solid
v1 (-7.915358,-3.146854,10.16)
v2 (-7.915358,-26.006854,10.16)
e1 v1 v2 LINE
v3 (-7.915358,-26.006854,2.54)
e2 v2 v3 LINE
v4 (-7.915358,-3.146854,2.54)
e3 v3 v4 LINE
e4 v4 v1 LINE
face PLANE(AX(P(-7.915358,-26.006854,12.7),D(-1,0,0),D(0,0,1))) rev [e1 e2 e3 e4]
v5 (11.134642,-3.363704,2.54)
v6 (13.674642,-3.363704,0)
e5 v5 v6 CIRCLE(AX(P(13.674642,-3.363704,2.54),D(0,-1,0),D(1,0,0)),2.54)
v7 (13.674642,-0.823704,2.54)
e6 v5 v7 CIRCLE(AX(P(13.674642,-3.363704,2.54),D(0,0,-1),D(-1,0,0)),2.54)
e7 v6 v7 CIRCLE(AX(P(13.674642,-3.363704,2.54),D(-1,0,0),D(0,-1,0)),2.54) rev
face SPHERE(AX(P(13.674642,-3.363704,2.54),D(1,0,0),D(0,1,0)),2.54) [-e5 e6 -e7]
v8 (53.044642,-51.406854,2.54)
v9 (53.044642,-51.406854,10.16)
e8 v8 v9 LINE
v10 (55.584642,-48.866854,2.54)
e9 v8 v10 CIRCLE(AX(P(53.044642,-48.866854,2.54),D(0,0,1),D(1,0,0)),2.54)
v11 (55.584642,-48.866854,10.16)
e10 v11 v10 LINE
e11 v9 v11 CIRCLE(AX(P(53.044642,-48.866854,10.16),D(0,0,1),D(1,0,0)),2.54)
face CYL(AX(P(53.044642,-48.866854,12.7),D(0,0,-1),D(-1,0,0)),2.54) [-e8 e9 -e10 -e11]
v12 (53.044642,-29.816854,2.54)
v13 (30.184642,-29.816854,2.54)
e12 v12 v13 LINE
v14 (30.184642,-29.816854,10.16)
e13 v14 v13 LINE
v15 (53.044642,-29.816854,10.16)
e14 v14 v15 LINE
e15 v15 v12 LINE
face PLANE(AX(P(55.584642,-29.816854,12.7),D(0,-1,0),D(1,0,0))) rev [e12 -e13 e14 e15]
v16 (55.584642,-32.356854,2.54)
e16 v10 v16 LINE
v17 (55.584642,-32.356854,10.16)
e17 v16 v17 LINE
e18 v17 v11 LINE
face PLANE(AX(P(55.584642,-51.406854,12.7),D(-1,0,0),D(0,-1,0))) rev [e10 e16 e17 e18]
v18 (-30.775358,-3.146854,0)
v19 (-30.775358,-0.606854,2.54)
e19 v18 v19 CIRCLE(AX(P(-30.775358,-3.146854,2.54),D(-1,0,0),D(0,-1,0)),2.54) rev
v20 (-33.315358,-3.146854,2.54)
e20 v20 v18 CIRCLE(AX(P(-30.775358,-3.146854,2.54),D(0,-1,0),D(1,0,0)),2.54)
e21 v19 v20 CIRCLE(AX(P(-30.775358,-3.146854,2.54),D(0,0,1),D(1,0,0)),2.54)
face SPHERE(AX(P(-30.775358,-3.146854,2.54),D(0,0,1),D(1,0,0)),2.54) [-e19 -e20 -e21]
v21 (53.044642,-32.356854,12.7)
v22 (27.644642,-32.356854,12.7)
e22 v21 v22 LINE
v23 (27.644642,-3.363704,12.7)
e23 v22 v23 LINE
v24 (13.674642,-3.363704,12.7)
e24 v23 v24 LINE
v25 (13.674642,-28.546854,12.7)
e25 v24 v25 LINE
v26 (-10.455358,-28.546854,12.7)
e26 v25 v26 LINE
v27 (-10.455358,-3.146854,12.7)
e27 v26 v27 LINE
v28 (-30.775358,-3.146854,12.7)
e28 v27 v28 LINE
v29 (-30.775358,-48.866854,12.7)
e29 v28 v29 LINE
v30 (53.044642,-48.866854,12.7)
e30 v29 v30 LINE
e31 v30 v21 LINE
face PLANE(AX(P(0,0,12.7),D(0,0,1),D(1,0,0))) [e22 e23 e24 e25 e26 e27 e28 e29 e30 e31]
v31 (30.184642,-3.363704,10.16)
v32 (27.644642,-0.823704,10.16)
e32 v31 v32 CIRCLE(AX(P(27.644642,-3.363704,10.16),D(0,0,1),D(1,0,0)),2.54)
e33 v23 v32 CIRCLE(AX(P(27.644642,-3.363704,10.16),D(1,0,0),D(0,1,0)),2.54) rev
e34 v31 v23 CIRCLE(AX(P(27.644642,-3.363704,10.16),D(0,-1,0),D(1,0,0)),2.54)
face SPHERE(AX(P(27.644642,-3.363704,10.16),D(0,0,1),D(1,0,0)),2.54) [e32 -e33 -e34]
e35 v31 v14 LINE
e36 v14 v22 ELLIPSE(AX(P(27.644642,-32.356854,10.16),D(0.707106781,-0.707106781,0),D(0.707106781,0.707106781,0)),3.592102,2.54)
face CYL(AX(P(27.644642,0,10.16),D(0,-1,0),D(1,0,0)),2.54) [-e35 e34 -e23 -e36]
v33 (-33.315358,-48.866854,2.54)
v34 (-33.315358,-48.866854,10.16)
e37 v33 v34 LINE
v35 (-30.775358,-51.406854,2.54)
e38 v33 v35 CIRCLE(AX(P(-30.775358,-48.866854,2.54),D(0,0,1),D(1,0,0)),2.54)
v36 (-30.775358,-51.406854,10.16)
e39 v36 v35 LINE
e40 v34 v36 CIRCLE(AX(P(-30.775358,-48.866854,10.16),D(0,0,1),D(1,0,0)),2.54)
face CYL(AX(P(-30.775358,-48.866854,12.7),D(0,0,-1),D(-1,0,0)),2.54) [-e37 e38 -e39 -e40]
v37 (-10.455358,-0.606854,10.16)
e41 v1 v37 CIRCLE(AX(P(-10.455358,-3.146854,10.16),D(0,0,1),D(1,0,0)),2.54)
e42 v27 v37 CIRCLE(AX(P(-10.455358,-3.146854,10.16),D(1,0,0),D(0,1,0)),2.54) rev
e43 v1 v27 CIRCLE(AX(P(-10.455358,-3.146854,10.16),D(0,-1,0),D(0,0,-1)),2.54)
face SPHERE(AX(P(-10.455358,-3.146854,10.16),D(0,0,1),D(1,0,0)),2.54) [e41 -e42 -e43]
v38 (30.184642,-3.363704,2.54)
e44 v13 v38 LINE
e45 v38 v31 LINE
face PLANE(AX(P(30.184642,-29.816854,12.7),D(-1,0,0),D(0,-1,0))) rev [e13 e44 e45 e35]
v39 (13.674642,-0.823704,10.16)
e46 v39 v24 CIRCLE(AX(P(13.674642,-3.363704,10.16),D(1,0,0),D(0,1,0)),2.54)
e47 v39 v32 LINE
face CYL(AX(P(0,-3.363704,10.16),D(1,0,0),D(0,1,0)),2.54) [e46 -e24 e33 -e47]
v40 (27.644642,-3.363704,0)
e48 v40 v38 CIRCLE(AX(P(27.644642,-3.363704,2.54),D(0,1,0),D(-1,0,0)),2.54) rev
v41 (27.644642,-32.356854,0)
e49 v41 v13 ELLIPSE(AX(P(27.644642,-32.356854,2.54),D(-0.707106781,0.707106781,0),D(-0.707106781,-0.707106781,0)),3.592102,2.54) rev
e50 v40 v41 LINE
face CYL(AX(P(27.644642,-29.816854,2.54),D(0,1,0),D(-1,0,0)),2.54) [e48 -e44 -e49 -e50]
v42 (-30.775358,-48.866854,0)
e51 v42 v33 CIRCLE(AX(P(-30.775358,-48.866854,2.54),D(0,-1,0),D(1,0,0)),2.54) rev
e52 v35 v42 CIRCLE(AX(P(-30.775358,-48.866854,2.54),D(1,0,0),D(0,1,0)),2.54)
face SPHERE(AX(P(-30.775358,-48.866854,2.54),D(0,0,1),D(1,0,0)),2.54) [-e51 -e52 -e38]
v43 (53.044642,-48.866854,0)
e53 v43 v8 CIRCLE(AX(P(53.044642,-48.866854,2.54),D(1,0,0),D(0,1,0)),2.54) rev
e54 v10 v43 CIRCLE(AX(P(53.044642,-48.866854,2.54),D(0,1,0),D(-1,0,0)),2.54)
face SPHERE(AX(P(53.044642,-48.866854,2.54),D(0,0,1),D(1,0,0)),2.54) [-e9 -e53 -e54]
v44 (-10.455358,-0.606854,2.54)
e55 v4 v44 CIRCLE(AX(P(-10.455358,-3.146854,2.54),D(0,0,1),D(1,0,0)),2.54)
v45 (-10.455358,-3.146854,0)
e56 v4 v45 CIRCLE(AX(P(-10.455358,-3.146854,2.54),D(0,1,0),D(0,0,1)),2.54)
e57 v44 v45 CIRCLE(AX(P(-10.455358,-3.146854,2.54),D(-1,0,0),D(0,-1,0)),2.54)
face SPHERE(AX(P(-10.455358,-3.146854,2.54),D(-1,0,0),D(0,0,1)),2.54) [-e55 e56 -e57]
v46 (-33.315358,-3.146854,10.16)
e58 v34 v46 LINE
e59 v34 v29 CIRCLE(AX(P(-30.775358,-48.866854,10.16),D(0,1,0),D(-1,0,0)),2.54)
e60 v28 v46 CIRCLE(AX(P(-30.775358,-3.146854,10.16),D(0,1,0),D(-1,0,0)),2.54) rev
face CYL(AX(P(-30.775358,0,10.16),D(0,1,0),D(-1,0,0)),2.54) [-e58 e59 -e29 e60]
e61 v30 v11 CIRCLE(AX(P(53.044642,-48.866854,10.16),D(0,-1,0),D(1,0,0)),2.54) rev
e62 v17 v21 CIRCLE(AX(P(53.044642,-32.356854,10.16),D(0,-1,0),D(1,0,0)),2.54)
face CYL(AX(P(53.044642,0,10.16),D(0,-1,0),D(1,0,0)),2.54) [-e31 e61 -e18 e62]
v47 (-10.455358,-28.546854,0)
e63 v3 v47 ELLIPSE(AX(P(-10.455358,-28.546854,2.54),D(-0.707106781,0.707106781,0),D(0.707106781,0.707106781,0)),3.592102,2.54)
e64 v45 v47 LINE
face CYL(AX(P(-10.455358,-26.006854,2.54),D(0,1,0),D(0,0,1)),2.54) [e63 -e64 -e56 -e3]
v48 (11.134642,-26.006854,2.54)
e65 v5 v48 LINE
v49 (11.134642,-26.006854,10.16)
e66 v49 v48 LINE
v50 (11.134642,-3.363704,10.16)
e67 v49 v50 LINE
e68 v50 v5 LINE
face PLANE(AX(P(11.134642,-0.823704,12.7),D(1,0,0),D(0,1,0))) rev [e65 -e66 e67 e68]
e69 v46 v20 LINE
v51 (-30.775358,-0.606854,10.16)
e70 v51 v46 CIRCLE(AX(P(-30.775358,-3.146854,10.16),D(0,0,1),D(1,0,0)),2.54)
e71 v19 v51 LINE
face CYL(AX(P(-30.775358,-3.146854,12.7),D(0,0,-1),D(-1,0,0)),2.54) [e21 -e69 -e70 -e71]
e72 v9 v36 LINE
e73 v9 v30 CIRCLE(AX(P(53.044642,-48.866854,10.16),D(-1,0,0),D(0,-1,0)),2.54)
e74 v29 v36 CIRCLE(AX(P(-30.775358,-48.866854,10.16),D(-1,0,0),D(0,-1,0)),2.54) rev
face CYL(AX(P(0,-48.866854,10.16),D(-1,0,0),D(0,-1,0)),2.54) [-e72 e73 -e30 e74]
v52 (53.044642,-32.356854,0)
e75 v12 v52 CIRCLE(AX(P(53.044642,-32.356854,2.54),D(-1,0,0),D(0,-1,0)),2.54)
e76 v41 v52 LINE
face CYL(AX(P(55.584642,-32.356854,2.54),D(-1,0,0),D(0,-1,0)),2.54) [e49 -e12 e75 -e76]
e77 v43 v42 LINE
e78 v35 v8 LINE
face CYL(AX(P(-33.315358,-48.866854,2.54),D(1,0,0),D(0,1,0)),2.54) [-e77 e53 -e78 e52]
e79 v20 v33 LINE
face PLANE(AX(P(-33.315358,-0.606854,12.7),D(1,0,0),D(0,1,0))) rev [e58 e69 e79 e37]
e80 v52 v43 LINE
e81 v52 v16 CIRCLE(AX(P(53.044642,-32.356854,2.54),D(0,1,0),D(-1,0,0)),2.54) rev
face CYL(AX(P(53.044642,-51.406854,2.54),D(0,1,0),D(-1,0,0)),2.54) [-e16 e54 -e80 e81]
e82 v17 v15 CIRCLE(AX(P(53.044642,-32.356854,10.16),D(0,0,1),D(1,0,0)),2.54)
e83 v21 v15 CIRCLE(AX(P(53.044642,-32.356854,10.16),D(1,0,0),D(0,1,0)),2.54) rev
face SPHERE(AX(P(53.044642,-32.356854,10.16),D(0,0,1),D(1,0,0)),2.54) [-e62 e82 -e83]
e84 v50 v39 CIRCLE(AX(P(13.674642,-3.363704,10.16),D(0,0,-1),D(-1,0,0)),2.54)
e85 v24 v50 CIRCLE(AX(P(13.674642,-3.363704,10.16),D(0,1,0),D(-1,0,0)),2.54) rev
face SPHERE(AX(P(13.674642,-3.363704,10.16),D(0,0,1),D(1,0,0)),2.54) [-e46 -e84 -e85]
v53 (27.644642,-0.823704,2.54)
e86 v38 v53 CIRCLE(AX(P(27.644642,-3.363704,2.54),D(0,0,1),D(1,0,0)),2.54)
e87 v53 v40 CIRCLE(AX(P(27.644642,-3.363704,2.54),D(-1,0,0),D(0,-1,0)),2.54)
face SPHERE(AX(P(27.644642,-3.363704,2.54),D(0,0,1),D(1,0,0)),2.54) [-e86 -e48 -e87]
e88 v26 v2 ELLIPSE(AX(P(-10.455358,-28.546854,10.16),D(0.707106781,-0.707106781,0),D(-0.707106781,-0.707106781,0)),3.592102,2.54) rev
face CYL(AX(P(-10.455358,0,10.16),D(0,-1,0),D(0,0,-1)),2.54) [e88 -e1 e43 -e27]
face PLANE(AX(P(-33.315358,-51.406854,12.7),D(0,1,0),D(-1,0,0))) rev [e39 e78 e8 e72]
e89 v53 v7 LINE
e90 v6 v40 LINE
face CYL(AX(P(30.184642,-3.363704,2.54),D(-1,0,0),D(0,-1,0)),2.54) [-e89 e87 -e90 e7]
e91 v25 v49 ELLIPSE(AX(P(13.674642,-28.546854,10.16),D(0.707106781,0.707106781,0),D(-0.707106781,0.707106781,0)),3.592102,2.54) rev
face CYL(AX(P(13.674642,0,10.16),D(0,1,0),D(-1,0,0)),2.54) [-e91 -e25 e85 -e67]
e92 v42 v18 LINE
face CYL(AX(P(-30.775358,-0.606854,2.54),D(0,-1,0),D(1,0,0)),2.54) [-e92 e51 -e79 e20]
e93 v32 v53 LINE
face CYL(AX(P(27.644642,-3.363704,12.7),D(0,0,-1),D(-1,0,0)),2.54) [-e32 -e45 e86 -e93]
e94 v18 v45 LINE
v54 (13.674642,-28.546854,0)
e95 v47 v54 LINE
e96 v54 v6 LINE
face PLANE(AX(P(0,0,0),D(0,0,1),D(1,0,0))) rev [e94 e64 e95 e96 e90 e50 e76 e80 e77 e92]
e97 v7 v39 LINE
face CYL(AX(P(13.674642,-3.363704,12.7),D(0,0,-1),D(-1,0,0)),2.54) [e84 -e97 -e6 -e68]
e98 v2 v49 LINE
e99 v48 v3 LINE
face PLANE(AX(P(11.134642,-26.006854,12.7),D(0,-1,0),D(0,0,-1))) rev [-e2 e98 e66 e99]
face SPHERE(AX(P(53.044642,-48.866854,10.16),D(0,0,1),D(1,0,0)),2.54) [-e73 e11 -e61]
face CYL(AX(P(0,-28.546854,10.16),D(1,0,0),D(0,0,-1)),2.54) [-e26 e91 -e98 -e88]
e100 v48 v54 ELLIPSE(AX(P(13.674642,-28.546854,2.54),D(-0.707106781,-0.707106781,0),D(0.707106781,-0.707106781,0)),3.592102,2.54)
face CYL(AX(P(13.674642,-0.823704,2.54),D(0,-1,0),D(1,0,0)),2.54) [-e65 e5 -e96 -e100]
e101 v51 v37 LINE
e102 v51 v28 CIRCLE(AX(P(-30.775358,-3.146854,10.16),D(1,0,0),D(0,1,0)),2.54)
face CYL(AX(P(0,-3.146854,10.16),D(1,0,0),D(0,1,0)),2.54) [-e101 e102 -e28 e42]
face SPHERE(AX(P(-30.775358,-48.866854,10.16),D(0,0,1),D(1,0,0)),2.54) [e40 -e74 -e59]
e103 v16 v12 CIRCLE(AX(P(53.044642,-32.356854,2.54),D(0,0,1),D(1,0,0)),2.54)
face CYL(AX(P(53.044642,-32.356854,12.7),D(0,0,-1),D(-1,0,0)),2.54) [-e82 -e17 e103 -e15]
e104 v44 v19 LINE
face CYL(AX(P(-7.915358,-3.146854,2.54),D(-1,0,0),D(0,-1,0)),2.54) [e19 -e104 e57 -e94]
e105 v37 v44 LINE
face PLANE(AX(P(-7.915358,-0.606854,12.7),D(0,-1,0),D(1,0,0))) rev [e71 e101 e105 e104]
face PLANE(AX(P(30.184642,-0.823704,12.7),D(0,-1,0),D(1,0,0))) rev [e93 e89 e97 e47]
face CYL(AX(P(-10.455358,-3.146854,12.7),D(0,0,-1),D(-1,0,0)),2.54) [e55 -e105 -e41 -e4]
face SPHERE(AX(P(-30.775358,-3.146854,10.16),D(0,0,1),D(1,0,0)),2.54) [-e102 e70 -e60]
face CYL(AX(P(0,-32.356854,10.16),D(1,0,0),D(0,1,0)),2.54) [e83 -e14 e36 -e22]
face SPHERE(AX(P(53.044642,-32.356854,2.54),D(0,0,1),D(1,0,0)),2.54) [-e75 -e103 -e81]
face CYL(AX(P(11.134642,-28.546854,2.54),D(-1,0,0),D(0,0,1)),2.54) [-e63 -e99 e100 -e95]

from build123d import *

# Parameters (mm, degrees)
BOSS_EXTRUDE1_DEPTH = 12.7
FILLET1_R           = 2.54
FILLET2_R           = 2.54
FILLET3_R           = 2.54


with BuildPart() as part:
    # Sketch1 → Boss-Extrude1 (new body)
    with BuildSketch(Plane.XY):
        Polygon((-33.315358132, -51.406853933), (55.584641868, -51.406853933), (55.584641868, -29.816853933), (30.184641868, -29.816853933), (30.184641868, -0.823703806), (11.134641868, -0.823703806), (11.134641868, -26.006853933), (-7.915358132, -26.006853933), (-7.915358132, -0.606853933), (-33.315358132, -0.606853933), align=None)
    extrude(amount=BOSS_EXTRUDE1_DEPTH)

    # Fillet1
    fillet1_edges = [part.edges().sort_by_distance(p)[0] for p in [
        (-20.615358132, -0.606853933, 0),
        (20.659641868, -0.823703806, 0),
        (30.184641868, -15.320278869, 0),
        (42.884641868, -29.816853933, 0),
        (55.584641868, -40.611853933, 12.7),
        (55.584641868, -40.611853933, 0),
        (11.134641868, -51.406853933, 0),
        (-33.315358132, -26.006853933, 0),
        (42.884641868, -29.816853933, 12.7),
        (30.184641868, -15.320278869, 12.7),
        (20.659641868, -0.823703806, 12.7),
        (11.134641868, -13.415278869, 12.7),
        (1.609641868, -26.006853933, 12.7),
        (-7.915358132, -13.306853933, 12.7),
        (-20.615358132, -0.606853933, 12.7),
        (-33.315358132, -26.006853933, 12.7),
        (11.134641868, -51.406853933, 12.7),
    ]]
    fillet(fillet1_edges, radius=FILLET1_R)

    # Fillet2
    # the kernel refuses this fillet: 2.54 mm, written as the material it takes off along each edge
    with BuildSketch(Plane(origin=(13.674641868, -3.363703806, 10.16), x_dir=(0, 1, 0), z_dir=(-1, 0, 0))) as fillet2_piece_1_section:
        Polygon((0, 0), (FILLET2_R, 0), (FILLET2_R, -FILLET2_R), (0, -FILLET2_R), align=None)
    fillet2_piece_1 = extrude(amount=FILLET2_R, mode=Mode.PRIVATE)
    fillet2_piece_1 = fillet2_piece_1 - Plane(origin=(13.674641868, -3.363703806, 10.16), x_dir=(0, -0.7071067811865475, -0.7071067811865475), z_dir=(-1, 0, 0)) * Sphere(FILLET2_R, mode=Mode.PRIVATE)
    add(fillet2_piece_1, mode=Mode.SUBTRACT)
    with BuildSketch(Plane(origin=(-10.455358132, -3.146853933, 10.16), x_dir=(1, 0, 0), z_dir=(0, 1, 0))) as fillet2_piece_2_section:
        Polygon((0, 0), (FILLET2_R, 0), (FILLET2_R, -FILLET2_R), (0, -FILLET2_R), align=None)
    fillet2_piece_2 = extrude(amount=FILLET2_R, mode=Mode.PRIVATE)
    fillet2_piece_2 = fillet2_piece_2 - Plane(origin=(-10.455358132, -3.146853933, 10.16), x_dir=(-0.7071067811865475, 0, -0.7071067811865475), z_dir=(0, 1, 0)) * Sphere(FILLET2_R, mode=Mode.PRIVATE)
    add(fillet2_piece_2, mode=Mode.SUBTRACT)
    with BuildSketch(Plane(origin=(-7.915358132, -26.006853933, 0), x_dir=(-1, 0, 0), z_dir=(0, 1, 0))) as fillet2_piece_3:
        with BuildLine():
            CenterArc((FILLET2_R, FILLET2_R), FILLET2_R, 180, 90)
            Line((0, FILLET2_R), (0, 0))
            Line((0, 0), (FILLET2_R, 0))
        make_face()
    extrude(amount=22.86, mode=Mode.SUBTRACT)
    with BuildSketch(Plane(origin=(11.134641868, -26.006853933, 0), x_dir=(0, -1, 0), z_dir=(-1, 0, 0))) as fillet2_piece_4:
        with BuildLine():
            CenterArc((FILLET2_R, FILLET2_R), FILLET2_R, 180, 90)
            Line((0, FILLET2_R), (0, 0))
            Line((0, 0), (FILLET2_R, 0))
        make_face()
    extrude(amount=19.05, mode=Mode.SUBTRACT)
    with BuildSketch(Plane(origin=(-7.915358132, -0.606853933, 2.54), x_dir=(-1, 0, 0), z_dir=(0, 0, 1)), Plane(origin=(11.134641868, -0.823703806, 2.54), x_dir=(0, -1, 0), z_dir=(0, 0, 1))) as fillet2_piece_5:
        with BuildLine():
            CenterArc((FILLET2_R, FILLET2_R), FILLET2_R, 180, 90)
            Line((0, FILLET2_R), (0, 0))
            Line((0, 0), (FILLET2_R, 0))
        make_face()
    extrude(amount=7.62, mode=Mode.SUBTRACT)
    with BuildSketch(Plane(origin=(11.134641868, -3.363703806, 0), x_dir=(1, 0, 0), z_dir=(0, -1, 0))) as fillet2_piece_6:
        with BuildLine():
            CenterArc((FILLET2_R, FILLET2_R), FILLET2_R, 180, 90)
            Line((0, FILLET2_R), (0, 0))
            Line((0, 0), (FILLET2_R, 0))
        make_face()
    extrude(amount=22.643150126, mode=Mode.SUBTRACT)
    with BuildSketch(Plane(origin=(-7.915358132, -3.146853933, 2.54), x_dir=(0, 1, 0), z_dir=(0, 0, 1))) as fillet2_piece_7:
        with BuildLine():
            CenterArc((2.54 - FILLET2_R, FILLET2_R), FILLET2_R, 270, 90)
            Line((2.54, FILLET2_R), (2.54, 0))
            Line((2.54, 0), (2.54 - FILLET2_R, 0))
        make_face()
    revolve(axis=Axis((-7.915358132, -3.146853933, 2.54), (-1, 0, 0)), revolution_arc=90, mode=Mode.SUBTRACT)
    with BuildSketch(Plane(origin=(11.134641868, -3.363703806, 2.54), x_dir=(0, 1, 0), z_dir=(0, 0, 1))) as fillet2_piece_8:
        with BuildLine():
            CenterArc((2.54 - FILLET2_R, -FILLET2_R), FILLET2_R, 0, 90)
            Line((2.54, -FILLET2_R), (2.54, 0))
            Line((2.54, 0), (2.54 - FILLET2_R, 0))
        make_face()
    revolve(axis=Axis((11.134641868, -3.363703806, 2.54), (-1, 0, 0)), revolution_arc=90, mode=Mode.SUBTRACT)
    with BuildSketch(Plane(origin=(11.134641868, -26.006853933, 0), x_dir=(0, -1, 0), z_dir=(-1, 0, 0))) as fillet2_piece_9a_section:
        with BuildLine():
            CenterArc((FILLET2_R, FILLET2_R), FILLET2_R, 180, 90)
            Line((0, FILLET2_R), (0, 0))
            Line((0, 0), (FILLET2_R, 0))
        make_face()
    fillet2_piece_9a = extrude(amount=25.4, mode=Mode.PRIVATE)
    fillet2_piece_9a = split(fillet2_piece_9a, bisect_by=Plane(origin=(-7.915358132, -26.581897523, 0.57504359), z_dir=(-1, 0, 0)), keep=Keep.TOP, mode=Mode.PRIVATE)
    with BuildSketch(Plane(origin=(-7.915358132, -32.356853933, 0), x_dir=(-1, 0, 0), z_dir=(0, 1, 0))) as fillet2_piece_9b_section:
        with BuildLine():
            CenterArc((FILLET2_R, FILLET2_R), FILLET2_R, 180, 90)
            Line((0, FILLET2_R), (0, 0))
            Line((0, 0), (FILLET2_R, 0))
        make_face()
    fillet2_piece_9b = extrude(amount=29.21, mode=Mode.PRIVATE)
    fillet2_piece_9b = split(fillet2_piece_9b, bisect_by=Plane(origin=(-8.490401722, -26.006853933, 0.57504359), z_dir=(0, -1, 0)), keep=Keep.TOP, mode=Mode.PRIVATE)
    fillet2_piece_9 = fillet2_piece_9a & fillet2_piece_9b
    add(fillet2_piece_9, mode=Mode.SUBTRACT)
    with BuildSketch(Plane(origin=(11.134641868, -3.363703806, 0), x_dir=(1, 0, 0), z_dir=(0, -1, 0))) as fillet2_piece_10a_section:
        with BuildLine():
            CenterArc((FILLET2_R, FILLET2_R), FILLET2_R, 180, 90)
            Line((0, FILLET2_R), (0, 0))
            Line((0, 0), (FILLET2_R, 0))
        make_face()
    fillet2_piece_10a = extrude(amount=28.993150126, mode=Mode.PRIVATE)
    fillet2_piece_10a = split(fillet2_piece_10a, bisect_by=Plane(origin=(11.709685459, -26.006853933, 0.57504359), z_dir=(0, -1, 0)), keep=Keep.TOP, mode=Mode.PRIVATE)
    with BuildSketch(Plane(origin=(17.484641868, -26.006853933, 0), x_dir=(0, -1, 0), z_dir=(-1, 0, 0))) as fillet2_piece_10b_section:
        with BuildLine():
            CenterArc((FILLET2_R, FILLET2_R), FILLET2_R, 180, 90)
            Line((0, FILLET2_R), (0, 0))
            Line((0, 0), (FILLET2_R, 0))
        make_face()
    fillet2_piece_10b = extrude(amount=25.4, mode=Mode.PRIVATE)
    fillet2_piece_10b = split(fillet2_piece_10b, bisect_by=Plane(origin=(11.134641868, -26.581897523, 0.57504359), z_dir=(1, 0, 0)), keep=Keep.TOP, mode=Mode.PRIVATE)
    fillet2_piece_10 = fillet2_piece_10a & fillet2_piece_10b
    add(fillet2_piece_10, mode=Mode.SUBTRACT)

    # Fillet3
    # the kernel refuses this fillet: 2.54 mm, written as the material it takes off along each edge
    with BuildSketch(Plane(origin=(27.644641868, -3.363703806, 2.54), x_dir=(0, 1, 0), z_dir=(1, 0, 0))) as fillet3_piece_1_section:
        Polygon((0, 0), (FILLET3_R, 0), (FILLET3_R, -FILLET3_R), (0, -FILLET3_R), align=None)
    fillet3_piece_1 = extrude(amount=FILLET3_R, mode=Mode.PRIVATE)
    fillet3_piece_1 = fillet3_piece_1 - Plane(origin=(27.644641868, -3.363703806, 2.54), x_dir=(0, -0.7071067811865475, 0.7071067811865475), z_dir=(1, 0, 0)) * Sphere(FILLET3_R, mode=Mode.PRIVATE)
    add(fillet3_piece_1, mode=Mode.SUBTRACT)
    with BuildSketch(Plane(origin=(53.044641868, -32.356853933, 2.54), x_dir=(0, 1, 0), z_dir=(1, 0, 0))) as fillet3_piece_2_section:
        Polygon((0, 0), (FILLET3_R, 0), (FILLET3_R, -FILLET3_R), (0, -FILLET3_R), align=None)
    fillet3_piece_2 = extrude(amount=FILLET3_R, mode=Mode.PRIVATE)
    fillet3_piece_2 = fillet3_piece_2 - Plane(origin=(53.044641868, -32.356853933, 2.54), x_dir=(0, -0.7071067811865475, 0.7071067811865475), z_dir=(1, 0, 0)) * Sphere(FILLET3_R, mode=Mode.PRIVATE)
    add(fillet3_piece_2, mode=Mode.SUBTRACT)
    with BuildSketch(Plane(origin=(53.044641868, -48.866853933, 2.54), x_dir=(1, 0, 0), z_dir=(0, -1, 0))) as fillet3_piece_3_section:
        Polygon((0, 0), (FILLET3_R, 0), (FILLET3_R, -FILLET3_R), (0, -FILLET3_R), align=None)
    fillet3_piece_3 = extrude(amount=FILLET3_R, mode=Mode.PRIVATE)
    fillet3_piece_3 = fillet3_piece_3 - Plane(origin=(53.044641868, -48.866853933, 2.54), x_dir=(-0.7071067811865475, 0, 0.7071067811865475), z_dir=(0, -1, 0)) * Sphere(FILLET3_R, mode=Mode.PRIVATE)
    add(fillet3_piece_3, mode=Mode.SUBTRACT)
    with BuildSketch(Plane(origin=(-30.775358132, -48.866853933, 2.54), x_dir=(-1, 0, 0), z_dir=(0, -1, 0))) as fillet3_piece_4_section:
        Polygon((0, 0), (FILLET3_R, 0), (FILLET3_R, FILLET3_R), (0, FILLET3_R), align=None)
    fillet3_piece_4 = extrude(amount=FILLET3_R, mode=Mode.PRIVATE)
    fillet3_piece_4 = fillet3_piece_4 - Plane(origin=(-30.775358132, -48.866853933, 2.54), x_dir=(0.7071067811865475, 0, 0.7071067811865475), z_dir=(0, -1, 0)) * Sphere(FILLET3_R, mode=Mode.PRIVATE)
    add(fillet3_piece_4, mode=Mode.SUBTRACT)
    with BuildSketch(Plane(origin=(-30.775358132, -3.146853933, 2.54), x_dir=(-1, 0, 0), z_dir=(0, 1, 0))) as fillet3_piece_5_section:
        Polygon((0, 0), (FILLET3_R, 0), (FILLET3_R, -FILLET3_R), (0, -FILLET3_R), align=None)
    fillet3_piece_5 = extrude(amount=FILLET3_R, mode=Mode.PRIVATE)
    fillet3_piece_5 = fillet3_piece_5 - Plane(origin=(-30.775358132, -3.146853933, 2.54), x_dir=(0.7071067811865475, 0, 0.7071067811865475), z_dir=(0, 1, 0)) * Sphere(FILLET3_R, mode=Mode.PRIVATE)
    add(fillet3_piece_5, mode=Mode.SUBTRACT)
    with BuildSketch(Plane(origin=(27.644641868, -3.363703806, 10.16), x_dir=(0, 1, 0), z_dir=(1, 0, 0))) as fillet3_piece_6_section:
        Polygon((0, 0), (FILLET3_R, 0), (FILLET3_R, FILLET3_R), (0, FILLET3_R), align=None)
    fillet3_piece_6 = extrude(amount=FILLET3_R, mode=Mode.PRIVATE)
    fillet3_piece_6 = fillet3_piece_6 - Plane(origin=(27.644641868, -3.363703806, 10.16), x_dir=(0, -0.7071067811865475, -0.7071067811865475), z_dir=(1, 0, 0)) * Sphere(FILLET3_R, mode=Mode.PRIVATE)
    add(fillet3_piece_6, mode=Mode.SUBTRACT)
    with BuildSketch(Plane(origin=(53.044641868, -32.356853933, 10.16), x_dir=(0, 1, 0), z_dir=(1, 0, 0))) as fillet3_piece_7_section:
        Polygon((0, 0), (FILLET3_R, 0), (FILLET3_R, FILLET3_R), (0, FILLET3_R), align=None)
    fillet3_piece_7 = extrude(amount=FILLET3_R, mode=Mode.PRIVATE)
    fillet3_piece_7 = fillet3_piece_7 - Plane(origin=(53.044641868, -32.356853933, 10.16), x_dir=(0, -0.7071067811865475, -0.7071067811865475), z_dir=(1, 0, 0)) * Sphere(FILLET3_R, mode=Mode.PRIVATE)
    add(fillet3_piece_7, mode=Mode.SUBTRACT)
    with BuildSketch(Plane(origin=(53.044641868, -48.866853933, 10.16), x_dir=(1, 0, 0), z_dir=(0, -1, 0))) as fillet3_piece_8_section:
        Polygon((0, 0), (FILLET3_R, 0), (FILLET3_R, FILLET3_R), (0, FILLET3_R), align=None)
    fillet3_piece_8 = extrude(amount=FILLET3_R, mode=Mode.PRIVATE)
    fillet3_piece_8 = fillet3_piece_8 - Plane(origin=(53.044641868, -48.866853933, 10.16), x_dir=(-0.7071067811865475, 0, -0.7071067811865475), z_dir=(0, -1, 0)) * Sphere(FILLET3_R, mode=Mode.PRIVATE)
    add(fillet3_piece_8, mode=Mode.SUBTRACT)
    with BuildSketch(Plane(origin=(-30.775358132, -3.146853933, 10.16), x_dir=(-1, 0, 0), z_dir=(0, 1, 0))) as fillet3_piece_9_section:
        Polygon((0, 0), (FILLET3_R, 0), (FILLET3_R, FILLET3_R), (0, FILLET3_R), align=None)
    fillet3_piece_9 = extrude(amount=FILLET3_R, mode=Mode.PRIVATE)
    fillet3_piece_9 = fillet3_piece_9 - Plane(origin=(-30.775358132, -3.146853933, 10.16), x_dir=(0.7071067811865475, 0, -0.7071067811865475), z_dir=(0, 1, 0)) * Sphere(FILLET3_R, mode=Mode.PRIVATE)
    add(fillet3_piece_9, mode=Mode.SUBTRACT)
    with BuildSketch(Plane(origin=(-30.775358132, -48.866853933, 10.16), x_dir=(-1, 0, 0), z_dir=(0, -1, 0))) as fillet3_piece_10_section:
        Polygon((0, 0), (FILLET3_R, 0), (FILLET3_R, -FILLET3_R), (0, -FILLET3_R), align=None)
    fillet3_piece_10 = extrude(amount=FILLET3_R, mode=Mode.PRIVATE)
    fillet3_piece_10 = fillet3_piece_10 - Plane(origin=(-30.775358132, -48.866853933, 10.16), x_dir=(0.7071067811865475, 0, -0.7071067811865475), z_dir=(0, -1, 0)) * Sphere(FILLET3_R, mode=Mode.PRIVATE)
    add(fillet3_piece_10, mode=Mode.SUBTRACT)
    with BuildSketch(Plane(origin=(-33.315358132, -0.606853933, 2.54), x_dir=(1, 0, 0), z_dir=(0, 0, 1)), Plane(origin=(55.584641868, -51.406853933, 2.54), x_dir=(-1, 0, 0), z_dir=(0, 0, 1)), Plane(origin=(55.584641868, -29.816853933, 2.54), x_dir=(0, -1, 0), z_dir=(0, 0, 1)), Plane(origin=(30.184641868, -0.823703806, 2.54), x_dir=(0, -1, 0), z_dir=(0, 0, 1))) as fillet3_piece_11:
        with BuildLine():
            CenterArc((FILLET3_R, -FILLET3_R), FILLET3_R, 90, 90)
            Line((0, -FILLET3_R), (0, 0))
            Line((0, 0), (FILLET3_R, 0))
        make_face()
    extrude(amount=7.62, mode=Mode.SUBTRACT)
    with BuildSketch(Plane(origin=(-33.315358132, -51.406853933, 2.54), x_dir=(1, 0, 0), z_dir=(0, 0, 1))) as fillet3_piece_12:
        with BuildLine():
            CenterArc((FILLET3_R, FILLET3_R), FILLET3_R, 180, 90)
            Line((0, FILLET3_R), (0, 0))
            Line((0, 0), (FILLET3_R, 0))
        make_face()
    extrude(amount=7.62, mode=Mode.SUBTRACT)


solid = part.part
